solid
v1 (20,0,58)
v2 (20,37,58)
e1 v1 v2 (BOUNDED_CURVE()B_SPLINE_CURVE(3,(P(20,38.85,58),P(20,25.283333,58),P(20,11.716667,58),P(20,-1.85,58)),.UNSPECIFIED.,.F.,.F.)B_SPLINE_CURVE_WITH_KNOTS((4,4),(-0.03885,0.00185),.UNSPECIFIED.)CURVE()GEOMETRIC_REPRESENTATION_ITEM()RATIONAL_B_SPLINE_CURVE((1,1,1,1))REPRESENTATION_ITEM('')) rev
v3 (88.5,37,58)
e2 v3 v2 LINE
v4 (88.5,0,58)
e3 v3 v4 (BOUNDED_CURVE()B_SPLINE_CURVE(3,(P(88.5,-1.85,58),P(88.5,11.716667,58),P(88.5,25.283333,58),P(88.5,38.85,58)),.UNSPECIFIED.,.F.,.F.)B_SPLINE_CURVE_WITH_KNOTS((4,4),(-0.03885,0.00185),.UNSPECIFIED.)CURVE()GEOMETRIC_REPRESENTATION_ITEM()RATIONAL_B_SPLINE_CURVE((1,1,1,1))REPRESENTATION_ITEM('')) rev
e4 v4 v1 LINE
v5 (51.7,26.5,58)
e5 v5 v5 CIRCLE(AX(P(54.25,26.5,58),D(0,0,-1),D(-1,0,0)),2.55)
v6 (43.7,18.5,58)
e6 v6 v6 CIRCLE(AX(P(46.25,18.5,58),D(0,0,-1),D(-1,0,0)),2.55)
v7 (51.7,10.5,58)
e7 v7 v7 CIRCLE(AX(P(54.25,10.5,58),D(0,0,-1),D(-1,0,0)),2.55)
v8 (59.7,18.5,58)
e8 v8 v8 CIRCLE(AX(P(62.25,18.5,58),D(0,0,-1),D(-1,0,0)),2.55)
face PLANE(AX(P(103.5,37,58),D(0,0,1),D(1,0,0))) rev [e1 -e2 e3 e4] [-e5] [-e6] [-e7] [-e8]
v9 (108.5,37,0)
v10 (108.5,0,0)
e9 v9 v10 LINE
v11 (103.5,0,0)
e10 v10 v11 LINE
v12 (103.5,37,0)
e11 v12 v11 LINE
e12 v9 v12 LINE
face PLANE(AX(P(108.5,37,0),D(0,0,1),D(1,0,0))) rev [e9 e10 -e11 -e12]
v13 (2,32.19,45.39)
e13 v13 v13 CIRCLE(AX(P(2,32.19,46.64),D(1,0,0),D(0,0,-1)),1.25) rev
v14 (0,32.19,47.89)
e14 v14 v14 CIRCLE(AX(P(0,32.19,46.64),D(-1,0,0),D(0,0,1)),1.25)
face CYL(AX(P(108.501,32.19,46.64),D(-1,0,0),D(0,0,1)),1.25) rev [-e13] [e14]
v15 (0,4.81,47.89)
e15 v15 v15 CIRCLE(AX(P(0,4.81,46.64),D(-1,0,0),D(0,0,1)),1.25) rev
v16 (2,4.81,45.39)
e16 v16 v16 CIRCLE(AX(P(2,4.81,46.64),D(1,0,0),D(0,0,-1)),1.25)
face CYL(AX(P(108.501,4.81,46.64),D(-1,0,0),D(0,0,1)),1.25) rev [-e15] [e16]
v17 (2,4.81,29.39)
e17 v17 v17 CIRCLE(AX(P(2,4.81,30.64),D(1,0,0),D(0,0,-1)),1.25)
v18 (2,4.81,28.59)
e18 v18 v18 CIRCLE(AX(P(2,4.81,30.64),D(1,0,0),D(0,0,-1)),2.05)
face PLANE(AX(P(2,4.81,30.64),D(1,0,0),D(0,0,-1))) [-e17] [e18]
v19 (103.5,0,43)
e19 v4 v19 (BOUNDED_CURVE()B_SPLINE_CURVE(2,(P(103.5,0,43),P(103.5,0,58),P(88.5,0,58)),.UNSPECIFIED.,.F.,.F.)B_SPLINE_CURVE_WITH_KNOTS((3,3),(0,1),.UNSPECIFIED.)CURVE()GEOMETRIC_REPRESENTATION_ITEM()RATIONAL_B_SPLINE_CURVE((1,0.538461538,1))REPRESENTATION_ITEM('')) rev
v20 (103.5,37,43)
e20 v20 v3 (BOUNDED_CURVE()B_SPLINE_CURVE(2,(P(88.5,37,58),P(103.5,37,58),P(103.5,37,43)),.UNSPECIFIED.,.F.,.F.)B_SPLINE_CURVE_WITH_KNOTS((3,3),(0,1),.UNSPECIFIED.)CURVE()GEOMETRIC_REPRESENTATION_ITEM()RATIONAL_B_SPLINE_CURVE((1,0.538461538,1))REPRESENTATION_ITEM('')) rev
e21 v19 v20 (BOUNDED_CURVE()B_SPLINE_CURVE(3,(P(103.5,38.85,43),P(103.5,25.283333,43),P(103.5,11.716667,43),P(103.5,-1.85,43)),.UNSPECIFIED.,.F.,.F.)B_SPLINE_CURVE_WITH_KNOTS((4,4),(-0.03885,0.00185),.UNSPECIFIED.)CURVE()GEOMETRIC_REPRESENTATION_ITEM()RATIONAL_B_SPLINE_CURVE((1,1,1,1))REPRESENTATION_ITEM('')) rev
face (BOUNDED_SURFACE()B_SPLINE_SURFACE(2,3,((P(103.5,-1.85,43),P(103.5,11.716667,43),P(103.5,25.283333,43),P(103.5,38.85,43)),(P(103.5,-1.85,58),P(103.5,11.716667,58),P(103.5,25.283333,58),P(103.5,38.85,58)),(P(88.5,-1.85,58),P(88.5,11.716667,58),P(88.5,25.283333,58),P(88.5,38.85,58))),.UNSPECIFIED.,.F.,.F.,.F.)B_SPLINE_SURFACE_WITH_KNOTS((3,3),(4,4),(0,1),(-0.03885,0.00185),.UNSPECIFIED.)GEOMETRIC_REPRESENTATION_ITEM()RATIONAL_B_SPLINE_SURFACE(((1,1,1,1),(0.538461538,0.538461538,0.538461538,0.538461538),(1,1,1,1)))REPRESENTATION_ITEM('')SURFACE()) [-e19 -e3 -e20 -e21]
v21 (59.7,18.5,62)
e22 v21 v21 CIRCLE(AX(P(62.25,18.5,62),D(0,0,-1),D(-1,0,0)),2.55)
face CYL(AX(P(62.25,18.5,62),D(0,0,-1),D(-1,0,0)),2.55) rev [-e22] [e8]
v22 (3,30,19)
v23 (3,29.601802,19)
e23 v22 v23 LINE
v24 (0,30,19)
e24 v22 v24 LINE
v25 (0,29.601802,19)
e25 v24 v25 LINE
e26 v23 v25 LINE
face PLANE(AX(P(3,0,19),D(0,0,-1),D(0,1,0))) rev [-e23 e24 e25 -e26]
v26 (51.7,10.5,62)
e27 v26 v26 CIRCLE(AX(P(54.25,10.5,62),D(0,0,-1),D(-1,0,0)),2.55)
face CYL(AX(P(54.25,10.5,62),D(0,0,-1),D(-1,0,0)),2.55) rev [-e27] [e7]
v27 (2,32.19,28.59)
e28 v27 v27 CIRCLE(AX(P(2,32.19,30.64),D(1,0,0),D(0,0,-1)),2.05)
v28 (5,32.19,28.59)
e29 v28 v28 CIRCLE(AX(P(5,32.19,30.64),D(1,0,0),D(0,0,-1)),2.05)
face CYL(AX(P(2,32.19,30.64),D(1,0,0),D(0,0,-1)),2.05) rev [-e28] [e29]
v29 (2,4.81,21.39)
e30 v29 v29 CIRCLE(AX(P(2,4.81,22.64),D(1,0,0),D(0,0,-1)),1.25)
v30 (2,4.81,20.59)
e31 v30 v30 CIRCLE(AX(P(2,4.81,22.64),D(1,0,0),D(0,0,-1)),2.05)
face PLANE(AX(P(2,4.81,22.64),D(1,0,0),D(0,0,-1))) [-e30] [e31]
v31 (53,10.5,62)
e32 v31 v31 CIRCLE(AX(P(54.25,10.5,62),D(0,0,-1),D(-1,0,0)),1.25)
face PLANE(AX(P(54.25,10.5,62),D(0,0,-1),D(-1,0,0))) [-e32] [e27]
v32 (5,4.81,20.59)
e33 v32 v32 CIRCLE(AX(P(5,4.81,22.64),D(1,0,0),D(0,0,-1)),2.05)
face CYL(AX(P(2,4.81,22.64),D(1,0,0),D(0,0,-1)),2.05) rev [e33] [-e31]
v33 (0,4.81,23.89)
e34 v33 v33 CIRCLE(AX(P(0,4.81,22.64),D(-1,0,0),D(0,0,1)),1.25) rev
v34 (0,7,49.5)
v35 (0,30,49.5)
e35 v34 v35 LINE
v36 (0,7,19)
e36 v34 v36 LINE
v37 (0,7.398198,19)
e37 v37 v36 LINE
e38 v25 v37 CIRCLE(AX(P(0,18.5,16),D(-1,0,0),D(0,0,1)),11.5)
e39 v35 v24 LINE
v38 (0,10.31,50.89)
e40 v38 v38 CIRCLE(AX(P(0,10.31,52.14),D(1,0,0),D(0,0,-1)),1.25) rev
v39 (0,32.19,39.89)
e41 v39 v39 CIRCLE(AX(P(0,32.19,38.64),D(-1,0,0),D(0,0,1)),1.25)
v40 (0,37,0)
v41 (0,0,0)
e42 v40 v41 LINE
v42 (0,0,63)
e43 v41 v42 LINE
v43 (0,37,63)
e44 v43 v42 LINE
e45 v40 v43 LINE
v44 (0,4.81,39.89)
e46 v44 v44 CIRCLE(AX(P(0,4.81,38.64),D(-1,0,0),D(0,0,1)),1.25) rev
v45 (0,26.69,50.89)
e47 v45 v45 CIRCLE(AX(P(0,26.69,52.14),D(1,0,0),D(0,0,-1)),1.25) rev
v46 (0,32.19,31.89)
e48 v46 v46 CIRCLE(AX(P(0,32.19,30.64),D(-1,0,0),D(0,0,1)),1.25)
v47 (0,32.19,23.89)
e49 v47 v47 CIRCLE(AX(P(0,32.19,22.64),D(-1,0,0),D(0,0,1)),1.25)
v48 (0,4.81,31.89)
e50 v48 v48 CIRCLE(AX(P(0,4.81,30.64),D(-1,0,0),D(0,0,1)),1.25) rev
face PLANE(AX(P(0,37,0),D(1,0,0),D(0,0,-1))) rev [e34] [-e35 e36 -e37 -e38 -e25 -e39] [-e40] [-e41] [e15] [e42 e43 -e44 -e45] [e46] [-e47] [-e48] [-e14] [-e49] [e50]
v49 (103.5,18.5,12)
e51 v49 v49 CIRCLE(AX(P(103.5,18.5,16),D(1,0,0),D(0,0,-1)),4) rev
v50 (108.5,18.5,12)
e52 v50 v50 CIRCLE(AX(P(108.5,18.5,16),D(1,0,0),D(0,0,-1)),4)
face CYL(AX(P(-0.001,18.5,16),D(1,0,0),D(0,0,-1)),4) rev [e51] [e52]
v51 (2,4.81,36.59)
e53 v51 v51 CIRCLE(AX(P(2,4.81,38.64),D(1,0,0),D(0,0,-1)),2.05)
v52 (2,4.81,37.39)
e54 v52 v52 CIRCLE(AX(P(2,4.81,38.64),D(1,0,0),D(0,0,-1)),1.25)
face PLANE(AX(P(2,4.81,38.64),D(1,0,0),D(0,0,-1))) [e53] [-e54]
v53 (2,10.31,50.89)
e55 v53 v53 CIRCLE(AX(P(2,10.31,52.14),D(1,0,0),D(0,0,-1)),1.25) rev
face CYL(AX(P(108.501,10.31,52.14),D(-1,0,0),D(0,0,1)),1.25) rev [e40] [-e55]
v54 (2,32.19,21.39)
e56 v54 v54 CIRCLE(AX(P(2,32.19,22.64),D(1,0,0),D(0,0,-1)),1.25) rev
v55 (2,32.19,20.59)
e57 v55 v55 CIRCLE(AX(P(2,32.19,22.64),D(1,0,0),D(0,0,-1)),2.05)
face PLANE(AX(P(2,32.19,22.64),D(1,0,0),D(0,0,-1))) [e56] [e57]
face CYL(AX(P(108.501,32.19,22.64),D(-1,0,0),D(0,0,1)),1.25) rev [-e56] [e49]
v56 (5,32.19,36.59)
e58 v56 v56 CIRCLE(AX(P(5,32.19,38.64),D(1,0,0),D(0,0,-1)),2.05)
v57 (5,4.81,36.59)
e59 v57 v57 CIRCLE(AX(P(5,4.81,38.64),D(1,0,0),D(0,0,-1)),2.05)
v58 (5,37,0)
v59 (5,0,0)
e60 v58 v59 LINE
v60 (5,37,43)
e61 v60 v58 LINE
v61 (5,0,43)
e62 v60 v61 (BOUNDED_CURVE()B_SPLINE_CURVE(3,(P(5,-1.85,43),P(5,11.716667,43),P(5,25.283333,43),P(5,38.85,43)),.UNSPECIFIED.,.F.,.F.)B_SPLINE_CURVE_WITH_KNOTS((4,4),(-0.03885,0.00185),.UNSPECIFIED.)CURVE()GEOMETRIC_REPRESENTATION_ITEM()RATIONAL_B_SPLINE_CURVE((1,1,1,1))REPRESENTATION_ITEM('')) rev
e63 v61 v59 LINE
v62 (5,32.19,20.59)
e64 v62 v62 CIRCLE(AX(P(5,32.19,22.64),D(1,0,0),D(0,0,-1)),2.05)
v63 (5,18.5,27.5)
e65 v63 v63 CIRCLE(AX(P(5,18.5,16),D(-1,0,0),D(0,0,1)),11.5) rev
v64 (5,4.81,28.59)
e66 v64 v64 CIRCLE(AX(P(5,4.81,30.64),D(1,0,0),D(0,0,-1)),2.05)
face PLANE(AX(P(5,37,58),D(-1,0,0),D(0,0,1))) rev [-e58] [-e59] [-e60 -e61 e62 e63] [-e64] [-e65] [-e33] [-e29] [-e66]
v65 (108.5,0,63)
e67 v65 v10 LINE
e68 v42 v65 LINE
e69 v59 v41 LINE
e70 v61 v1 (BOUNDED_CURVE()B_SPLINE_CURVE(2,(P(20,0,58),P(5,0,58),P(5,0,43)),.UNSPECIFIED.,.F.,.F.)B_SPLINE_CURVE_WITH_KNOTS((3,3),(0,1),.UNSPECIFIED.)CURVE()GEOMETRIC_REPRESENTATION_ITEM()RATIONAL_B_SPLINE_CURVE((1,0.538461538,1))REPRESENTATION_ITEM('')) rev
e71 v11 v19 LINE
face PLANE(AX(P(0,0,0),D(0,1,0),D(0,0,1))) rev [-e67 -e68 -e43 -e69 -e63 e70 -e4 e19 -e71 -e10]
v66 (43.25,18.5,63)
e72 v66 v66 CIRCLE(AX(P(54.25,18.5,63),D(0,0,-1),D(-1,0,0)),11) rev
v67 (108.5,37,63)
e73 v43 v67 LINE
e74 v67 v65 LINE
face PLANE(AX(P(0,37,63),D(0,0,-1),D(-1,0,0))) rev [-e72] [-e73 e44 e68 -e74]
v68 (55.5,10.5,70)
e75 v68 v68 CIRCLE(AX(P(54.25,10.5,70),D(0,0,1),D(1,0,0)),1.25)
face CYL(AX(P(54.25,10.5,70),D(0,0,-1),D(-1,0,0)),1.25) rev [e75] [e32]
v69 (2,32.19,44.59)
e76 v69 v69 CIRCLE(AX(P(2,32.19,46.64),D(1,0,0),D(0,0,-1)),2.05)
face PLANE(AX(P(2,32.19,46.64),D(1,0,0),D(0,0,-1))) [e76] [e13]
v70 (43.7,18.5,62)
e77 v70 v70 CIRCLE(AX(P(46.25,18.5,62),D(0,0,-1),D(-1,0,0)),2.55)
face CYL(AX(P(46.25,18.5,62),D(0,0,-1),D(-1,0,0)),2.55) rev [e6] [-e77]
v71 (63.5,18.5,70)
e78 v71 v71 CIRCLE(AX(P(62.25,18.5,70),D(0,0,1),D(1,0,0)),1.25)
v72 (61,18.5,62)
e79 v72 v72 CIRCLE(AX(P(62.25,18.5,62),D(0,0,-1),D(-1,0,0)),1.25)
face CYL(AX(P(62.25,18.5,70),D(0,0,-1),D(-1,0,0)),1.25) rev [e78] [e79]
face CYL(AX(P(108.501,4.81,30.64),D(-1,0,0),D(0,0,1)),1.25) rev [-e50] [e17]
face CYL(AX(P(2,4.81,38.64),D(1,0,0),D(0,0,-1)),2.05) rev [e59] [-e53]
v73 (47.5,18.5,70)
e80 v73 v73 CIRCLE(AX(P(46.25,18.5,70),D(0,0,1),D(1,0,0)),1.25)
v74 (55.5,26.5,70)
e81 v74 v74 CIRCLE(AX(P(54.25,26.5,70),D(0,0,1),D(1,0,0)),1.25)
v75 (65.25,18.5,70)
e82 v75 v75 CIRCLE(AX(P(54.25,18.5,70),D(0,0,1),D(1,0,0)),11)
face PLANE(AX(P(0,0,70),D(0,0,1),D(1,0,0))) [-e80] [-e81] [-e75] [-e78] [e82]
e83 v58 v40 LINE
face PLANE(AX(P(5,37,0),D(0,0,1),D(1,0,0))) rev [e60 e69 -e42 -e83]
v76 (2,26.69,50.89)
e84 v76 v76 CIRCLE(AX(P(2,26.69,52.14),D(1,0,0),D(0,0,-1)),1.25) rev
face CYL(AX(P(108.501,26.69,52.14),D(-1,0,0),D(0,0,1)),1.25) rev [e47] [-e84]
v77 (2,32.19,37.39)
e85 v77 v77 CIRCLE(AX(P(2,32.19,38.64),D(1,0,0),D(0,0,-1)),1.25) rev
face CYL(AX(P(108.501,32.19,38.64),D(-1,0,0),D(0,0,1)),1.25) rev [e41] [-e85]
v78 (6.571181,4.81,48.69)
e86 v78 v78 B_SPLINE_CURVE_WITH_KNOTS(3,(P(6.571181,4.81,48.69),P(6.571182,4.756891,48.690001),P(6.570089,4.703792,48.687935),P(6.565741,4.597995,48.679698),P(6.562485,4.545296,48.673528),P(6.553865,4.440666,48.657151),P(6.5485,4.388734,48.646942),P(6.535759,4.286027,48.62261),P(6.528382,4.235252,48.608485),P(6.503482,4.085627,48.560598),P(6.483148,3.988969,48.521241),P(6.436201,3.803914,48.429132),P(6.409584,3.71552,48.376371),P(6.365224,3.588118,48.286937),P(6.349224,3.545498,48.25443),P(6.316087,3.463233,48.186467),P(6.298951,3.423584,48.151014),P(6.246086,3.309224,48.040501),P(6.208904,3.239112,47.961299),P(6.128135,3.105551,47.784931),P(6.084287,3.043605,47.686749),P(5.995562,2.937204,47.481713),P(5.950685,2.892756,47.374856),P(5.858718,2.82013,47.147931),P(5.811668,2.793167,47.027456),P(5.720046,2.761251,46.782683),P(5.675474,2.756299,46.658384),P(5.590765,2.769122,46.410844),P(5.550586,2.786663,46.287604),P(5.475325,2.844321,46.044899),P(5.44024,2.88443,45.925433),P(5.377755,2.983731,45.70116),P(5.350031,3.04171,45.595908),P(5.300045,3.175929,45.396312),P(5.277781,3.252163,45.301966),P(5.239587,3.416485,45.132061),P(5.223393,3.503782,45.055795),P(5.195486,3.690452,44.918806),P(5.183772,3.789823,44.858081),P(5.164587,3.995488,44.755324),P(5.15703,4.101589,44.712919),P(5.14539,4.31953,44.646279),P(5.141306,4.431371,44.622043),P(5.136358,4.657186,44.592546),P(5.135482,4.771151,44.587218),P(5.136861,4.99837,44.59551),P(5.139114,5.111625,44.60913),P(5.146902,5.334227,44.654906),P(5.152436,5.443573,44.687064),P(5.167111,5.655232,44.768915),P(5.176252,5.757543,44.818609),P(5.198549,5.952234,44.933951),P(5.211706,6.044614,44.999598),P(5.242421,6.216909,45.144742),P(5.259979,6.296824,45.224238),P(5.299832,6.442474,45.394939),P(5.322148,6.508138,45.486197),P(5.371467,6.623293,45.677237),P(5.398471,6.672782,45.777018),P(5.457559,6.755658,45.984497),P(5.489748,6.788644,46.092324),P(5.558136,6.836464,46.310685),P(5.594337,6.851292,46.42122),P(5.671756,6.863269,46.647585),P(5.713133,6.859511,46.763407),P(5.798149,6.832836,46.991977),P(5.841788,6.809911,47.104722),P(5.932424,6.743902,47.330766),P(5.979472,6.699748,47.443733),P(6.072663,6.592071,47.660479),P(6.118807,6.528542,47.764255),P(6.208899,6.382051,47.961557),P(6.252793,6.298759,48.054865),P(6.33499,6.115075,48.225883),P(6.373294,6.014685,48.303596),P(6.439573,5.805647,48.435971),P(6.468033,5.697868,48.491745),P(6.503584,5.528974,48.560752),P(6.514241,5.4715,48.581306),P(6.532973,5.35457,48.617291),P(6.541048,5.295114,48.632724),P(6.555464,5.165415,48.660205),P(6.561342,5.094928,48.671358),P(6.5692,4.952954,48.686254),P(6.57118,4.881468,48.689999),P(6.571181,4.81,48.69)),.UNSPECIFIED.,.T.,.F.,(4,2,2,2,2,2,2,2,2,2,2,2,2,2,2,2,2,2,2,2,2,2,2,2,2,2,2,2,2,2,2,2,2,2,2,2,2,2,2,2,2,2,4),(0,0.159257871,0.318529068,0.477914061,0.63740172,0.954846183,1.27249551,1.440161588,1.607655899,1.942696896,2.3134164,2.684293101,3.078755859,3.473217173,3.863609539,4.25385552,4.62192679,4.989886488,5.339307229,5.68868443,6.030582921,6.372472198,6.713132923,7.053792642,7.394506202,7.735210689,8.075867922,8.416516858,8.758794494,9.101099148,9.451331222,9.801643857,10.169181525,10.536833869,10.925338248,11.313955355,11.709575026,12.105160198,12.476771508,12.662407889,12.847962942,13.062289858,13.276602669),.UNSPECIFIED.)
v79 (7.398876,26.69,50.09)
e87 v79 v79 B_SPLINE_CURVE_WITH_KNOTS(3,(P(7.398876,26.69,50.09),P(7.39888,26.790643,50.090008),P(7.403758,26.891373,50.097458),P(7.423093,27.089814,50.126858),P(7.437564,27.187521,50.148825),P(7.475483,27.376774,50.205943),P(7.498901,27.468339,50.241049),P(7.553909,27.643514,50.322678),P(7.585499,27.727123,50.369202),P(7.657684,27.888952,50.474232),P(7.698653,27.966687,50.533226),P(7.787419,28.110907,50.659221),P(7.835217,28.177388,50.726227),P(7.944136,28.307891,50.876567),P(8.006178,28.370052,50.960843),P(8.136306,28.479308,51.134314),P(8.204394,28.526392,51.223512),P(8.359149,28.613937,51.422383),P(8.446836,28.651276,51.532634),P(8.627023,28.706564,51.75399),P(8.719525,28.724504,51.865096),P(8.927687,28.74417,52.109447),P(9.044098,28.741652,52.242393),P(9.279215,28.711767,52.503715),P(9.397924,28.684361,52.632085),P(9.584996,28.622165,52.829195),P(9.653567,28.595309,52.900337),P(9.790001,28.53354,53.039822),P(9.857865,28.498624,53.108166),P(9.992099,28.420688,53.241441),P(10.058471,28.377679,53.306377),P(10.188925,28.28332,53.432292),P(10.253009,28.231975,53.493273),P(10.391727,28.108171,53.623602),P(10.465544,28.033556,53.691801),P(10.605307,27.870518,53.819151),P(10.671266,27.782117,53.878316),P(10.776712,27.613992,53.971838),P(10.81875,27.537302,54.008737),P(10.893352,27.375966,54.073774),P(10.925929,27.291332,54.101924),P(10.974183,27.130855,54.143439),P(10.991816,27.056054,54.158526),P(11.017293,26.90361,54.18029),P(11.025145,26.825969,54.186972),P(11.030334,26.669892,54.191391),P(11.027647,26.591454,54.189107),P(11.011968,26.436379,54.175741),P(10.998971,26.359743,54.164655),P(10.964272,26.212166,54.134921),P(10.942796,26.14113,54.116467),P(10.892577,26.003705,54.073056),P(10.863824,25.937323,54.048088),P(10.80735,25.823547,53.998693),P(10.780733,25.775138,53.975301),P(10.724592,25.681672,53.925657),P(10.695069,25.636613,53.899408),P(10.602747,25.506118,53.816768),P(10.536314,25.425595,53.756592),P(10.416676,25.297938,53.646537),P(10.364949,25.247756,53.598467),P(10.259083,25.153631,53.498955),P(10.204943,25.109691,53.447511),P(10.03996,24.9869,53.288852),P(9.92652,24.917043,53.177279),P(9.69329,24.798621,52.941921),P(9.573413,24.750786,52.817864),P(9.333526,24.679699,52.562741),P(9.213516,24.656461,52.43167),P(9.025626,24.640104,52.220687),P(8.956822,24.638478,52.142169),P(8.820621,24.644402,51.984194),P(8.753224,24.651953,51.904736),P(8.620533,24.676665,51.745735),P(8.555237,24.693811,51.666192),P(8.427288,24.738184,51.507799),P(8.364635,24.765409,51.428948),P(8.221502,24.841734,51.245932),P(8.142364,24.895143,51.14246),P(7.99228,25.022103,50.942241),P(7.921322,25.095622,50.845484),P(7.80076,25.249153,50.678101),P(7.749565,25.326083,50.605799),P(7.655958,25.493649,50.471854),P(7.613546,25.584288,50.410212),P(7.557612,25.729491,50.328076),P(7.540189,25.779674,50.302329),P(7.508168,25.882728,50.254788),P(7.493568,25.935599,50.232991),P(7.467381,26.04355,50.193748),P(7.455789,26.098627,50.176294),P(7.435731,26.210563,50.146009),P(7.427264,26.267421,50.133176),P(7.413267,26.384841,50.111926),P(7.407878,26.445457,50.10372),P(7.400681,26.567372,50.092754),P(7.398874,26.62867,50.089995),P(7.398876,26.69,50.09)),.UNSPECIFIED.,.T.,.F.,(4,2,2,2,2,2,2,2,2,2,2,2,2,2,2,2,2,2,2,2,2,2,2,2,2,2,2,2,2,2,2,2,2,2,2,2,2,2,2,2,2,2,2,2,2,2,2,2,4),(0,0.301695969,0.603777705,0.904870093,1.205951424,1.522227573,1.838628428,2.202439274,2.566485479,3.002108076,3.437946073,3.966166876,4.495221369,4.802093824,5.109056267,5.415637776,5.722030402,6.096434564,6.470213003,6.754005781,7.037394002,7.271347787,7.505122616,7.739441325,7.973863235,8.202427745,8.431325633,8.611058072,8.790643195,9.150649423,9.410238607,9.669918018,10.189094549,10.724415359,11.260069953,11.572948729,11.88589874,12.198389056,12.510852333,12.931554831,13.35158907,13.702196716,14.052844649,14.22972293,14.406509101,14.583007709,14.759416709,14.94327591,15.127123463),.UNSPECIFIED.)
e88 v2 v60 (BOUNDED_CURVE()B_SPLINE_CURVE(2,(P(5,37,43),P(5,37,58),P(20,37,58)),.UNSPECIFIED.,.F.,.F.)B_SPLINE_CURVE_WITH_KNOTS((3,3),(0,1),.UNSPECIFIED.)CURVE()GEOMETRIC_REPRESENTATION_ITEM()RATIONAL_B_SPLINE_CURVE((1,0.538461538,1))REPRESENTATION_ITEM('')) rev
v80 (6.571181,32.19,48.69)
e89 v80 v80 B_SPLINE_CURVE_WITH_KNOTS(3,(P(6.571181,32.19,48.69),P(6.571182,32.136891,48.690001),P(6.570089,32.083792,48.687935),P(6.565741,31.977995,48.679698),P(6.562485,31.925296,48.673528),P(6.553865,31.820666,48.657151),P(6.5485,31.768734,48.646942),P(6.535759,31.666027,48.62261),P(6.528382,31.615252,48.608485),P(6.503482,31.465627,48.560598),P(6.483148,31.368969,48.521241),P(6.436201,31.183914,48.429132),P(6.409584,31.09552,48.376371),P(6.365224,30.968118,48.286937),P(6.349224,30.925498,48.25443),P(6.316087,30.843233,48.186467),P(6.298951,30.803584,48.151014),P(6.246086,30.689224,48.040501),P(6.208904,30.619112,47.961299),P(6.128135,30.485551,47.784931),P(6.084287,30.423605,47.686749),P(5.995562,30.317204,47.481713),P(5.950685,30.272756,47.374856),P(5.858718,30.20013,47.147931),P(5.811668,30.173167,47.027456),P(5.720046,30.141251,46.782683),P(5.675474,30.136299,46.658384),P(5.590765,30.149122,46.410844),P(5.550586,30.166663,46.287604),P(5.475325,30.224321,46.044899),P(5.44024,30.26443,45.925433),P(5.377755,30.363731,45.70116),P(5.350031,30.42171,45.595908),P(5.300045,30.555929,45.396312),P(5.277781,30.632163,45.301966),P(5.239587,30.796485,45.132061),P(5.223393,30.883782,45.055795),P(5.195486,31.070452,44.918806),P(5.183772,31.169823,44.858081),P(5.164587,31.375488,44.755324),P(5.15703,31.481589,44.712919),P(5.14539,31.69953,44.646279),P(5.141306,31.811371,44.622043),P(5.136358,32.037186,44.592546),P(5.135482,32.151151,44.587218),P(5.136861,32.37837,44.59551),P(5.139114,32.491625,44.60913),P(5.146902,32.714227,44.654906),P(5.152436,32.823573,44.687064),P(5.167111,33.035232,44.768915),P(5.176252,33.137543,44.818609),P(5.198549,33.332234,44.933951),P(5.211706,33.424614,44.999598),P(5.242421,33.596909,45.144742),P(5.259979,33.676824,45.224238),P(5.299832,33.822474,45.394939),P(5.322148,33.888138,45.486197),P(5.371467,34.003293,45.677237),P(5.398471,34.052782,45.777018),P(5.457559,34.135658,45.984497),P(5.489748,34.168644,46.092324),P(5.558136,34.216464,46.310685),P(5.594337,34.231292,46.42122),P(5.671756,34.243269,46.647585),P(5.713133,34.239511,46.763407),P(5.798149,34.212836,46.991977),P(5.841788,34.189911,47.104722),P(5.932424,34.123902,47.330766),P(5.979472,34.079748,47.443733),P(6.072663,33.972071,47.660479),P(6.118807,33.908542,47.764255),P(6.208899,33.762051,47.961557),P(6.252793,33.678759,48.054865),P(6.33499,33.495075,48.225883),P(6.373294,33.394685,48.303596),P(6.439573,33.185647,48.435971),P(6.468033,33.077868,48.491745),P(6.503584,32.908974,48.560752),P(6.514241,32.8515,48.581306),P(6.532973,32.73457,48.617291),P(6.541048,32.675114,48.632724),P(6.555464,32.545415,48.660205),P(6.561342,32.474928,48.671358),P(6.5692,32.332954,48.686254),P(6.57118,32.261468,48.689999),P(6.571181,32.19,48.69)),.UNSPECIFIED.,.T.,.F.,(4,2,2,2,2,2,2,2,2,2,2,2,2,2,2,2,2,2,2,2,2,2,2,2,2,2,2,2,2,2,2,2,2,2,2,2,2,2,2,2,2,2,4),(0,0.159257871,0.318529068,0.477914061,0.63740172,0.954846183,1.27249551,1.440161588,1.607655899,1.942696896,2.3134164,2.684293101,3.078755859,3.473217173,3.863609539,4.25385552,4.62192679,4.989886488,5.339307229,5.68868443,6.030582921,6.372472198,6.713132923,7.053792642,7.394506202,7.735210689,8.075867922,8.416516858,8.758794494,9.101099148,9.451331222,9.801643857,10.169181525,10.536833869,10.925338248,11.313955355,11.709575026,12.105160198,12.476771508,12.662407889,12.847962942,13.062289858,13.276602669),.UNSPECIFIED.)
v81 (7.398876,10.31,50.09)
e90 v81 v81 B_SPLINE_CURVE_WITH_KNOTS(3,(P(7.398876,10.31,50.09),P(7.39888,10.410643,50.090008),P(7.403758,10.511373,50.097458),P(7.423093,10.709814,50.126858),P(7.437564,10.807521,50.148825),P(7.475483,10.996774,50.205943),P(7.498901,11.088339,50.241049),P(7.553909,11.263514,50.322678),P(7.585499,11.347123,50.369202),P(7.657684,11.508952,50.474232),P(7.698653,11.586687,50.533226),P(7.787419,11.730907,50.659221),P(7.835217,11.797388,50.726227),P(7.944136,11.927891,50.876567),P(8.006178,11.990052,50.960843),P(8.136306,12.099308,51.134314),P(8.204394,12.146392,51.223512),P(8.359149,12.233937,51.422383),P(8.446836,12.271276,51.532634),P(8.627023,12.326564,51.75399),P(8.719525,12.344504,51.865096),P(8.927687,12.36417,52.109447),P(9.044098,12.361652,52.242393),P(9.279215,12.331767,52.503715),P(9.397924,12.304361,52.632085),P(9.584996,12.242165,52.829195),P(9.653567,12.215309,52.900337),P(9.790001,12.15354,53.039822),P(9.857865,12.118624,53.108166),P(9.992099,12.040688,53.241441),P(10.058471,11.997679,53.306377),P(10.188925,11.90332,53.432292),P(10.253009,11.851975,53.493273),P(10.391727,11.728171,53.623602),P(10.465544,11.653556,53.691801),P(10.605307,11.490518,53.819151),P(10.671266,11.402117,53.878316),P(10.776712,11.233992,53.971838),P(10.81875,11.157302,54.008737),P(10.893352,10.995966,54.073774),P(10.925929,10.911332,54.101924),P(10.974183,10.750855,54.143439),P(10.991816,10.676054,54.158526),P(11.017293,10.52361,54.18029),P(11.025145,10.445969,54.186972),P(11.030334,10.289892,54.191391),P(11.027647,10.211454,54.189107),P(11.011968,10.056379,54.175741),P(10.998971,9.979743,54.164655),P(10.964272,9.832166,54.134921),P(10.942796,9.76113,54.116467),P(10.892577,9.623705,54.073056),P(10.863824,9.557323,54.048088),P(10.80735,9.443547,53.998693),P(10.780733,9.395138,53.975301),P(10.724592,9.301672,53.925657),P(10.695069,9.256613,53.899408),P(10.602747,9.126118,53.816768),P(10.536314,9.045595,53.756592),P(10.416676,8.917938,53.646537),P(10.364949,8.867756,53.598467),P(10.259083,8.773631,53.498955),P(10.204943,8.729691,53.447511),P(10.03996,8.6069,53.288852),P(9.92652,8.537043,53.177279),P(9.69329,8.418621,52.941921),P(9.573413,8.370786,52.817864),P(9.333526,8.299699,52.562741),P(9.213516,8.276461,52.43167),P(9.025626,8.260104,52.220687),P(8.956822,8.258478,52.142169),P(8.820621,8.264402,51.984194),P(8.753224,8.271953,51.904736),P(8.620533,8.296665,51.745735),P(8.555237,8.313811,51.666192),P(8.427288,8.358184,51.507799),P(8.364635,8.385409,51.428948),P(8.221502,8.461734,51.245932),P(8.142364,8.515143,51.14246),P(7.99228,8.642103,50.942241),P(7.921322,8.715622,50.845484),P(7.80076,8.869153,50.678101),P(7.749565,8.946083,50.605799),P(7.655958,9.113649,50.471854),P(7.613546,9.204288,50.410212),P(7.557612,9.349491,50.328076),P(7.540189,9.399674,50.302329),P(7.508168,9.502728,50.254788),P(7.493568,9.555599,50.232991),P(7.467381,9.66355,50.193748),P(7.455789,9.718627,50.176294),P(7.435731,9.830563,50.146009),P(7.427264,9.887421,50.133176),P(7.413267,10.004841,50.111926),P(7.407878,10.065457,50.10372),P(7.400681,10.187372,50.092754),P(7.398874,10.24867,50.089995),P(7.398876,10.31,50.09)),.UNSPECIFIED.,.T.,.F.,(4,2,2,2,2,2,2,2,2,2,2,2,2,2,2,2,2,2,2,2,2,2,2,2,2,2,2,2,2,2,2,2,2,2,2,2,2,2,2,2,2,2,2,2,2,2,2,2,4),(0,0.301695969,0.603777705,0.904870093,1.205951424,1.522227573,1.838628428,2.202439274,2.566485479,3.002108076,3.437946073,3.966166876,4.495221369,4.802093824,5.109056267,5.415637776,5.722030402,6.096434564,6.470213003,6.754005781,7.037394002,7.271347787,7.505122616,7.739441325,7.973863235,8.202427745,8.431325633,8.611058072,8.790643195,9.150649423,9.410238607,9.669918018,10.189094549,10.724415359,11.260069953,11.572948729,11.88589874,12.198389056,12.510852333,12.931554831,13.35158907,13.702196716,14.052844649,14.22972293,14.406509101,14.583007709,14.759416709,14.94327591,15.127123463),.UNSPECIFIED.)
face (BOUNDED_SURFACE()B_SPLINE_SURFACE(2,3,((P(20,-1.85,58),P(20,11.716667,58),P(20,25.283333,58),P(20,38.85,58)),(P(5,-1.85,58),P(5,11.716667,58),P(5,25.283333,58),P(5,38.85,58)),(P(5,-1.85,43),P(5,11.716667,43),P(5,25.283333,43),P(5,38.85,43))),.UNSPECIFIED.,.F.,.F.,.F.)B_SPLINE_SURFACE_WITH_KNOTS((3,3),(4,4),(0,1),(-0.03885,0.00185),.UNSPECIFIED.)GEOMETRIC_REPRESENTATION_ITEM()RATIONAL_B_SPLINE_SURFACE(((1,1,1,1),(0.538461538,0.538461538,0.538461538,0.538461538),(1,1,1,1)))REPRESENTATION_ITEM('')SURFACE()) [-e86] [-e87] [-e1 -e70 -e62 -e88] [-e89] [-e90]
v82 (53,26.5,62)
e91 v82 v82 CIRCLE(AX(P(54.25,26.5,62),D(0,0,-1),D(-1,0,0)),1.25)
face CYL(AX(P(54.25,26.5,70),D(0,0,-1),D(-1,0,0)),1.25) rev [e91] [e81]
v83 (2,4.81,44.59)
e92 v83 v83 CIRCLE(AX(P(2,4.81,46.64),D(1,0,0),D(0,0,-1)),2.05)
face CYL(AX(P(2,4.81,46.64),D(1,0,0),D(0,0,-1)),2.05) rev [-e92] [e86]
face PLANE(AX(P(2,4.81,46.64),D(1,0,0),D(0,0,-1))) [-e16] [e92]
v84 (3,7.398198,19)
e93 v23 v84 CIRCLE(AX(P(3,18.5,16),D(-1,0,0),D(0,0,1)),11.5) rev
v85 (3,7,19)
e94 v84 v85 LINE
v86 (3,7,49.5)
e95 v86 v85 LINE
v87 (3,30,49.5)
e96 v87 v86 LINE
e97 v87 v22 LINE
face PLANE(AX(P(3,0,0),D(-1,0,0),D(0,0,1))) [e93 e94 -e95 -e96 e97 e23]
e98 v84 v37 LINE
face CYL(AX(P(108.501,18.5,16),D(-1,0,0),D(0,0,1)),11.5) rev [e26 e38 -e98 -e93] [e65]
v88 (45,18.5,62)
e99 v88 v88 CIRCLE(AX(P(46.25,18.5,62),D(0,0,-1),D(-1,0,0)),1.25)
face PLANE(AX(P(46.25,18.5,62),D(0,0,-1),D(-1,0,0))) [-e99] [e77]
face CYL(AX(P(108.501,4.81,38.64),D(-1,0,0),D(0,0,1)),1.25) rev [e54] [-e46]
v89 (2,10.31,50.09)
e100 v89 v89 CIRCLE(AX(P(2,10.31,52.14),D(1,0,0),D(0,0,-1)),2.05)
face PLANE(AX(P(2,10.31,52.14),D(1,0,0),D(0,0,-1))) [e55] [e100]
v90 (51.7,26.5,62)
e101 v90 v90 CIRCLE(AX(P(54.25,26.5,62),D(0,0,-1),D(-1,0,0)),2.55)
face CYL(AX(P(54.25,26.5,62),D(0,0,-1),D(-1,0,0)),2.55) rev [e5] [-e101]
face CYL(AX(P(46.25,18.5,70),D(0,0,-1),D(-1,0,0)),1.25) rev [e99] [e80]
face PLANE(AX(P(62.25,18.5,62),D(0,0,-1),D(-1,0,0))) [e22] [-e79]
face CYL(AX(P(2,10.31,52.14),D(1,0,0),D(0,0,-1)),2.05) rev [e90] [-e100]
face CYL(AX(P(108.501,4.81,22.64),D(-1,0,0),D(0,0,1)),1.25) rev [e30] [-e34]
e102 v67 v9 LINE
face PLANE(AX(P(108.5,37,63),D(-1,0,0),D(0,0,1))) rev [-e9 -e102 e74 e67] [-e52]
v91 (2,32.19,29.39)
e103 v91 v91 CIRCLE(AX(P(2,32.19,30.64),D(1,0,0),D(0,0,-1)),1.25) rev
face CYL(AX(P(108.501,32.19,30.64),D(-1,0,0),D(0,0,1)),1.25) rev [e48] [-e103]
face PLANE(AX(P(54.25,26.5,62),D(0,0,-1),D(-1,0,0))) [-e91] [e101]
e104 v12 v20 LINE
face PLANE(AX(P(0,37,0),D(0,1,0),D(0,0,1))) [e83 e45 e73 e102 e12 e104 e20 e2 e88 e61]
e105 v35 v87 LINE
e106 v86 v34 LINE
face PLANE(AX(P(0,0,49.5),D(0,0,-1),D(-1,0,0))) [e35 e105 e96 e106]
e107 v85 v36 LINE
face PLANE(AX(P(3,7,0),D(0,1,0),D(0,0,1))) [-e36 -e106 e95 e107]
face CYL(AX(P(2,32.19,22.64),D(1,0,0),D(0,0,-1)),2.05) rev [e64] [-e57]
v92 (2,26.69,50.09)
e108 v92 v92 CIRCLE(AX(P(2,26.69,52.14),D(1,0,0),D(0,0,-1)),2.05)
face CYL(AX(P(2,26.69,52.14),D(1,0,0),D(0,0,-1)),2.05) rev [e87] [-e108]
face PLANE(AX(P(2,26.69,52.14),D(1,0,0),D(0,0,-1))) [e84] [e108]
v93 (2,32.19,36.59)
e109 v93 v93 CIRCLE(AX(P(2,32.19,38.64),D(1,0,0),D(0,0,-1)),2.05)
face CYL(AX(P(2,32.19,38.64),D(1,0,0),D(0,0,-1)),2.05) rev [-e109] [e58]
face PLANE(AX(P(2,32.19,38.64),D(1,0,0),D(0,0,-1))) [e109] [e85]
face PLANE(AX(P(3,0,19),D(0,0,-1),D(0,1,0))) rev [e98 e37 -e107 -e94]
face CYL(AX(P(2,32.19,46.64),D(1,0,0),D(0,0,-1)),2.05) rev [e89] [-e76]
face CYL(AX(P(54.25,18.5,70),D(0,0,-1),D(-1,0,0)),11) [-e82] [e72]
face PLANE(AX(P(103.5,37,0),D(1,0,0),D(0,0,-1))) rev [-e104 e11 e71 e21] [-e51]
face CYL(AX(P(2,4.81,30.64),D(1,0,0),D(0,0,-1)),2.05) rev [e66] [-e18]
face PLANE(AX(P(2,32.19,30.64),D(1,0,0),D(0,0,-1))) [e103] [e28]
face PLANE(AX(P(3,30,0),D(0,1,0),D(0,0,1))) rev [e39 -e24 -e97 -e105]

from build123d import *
from build123d.topology import SkipClean

# Parameters (mm, degrees)
BOSS_EXTRUDE3_DEPTH = 37
CUT_EXTRUDE3_REACH  = 132.806
SKETCH3_R           = 11.5
CUT_EXTRUDE4_REACH  = 132.806
SKETCH4_R           = 1.25
SKETCH6_W           = 38
SKETCH6_H           = 23
CUT_EXTRUDE6_DEPTH  = 3
SKETCH10_W          = 3
SKETCH10_H          = 23
BOSS_EXTRUDE5_DEPTH = 7.5
CUT_EXTRUDE11_REACH = 130.329
SKETCH11_R          = 1.25
SKETCH12_R          = 2.05
CUT_EXTRUDE12_DEPTH = 3
CUT_EXTRUDE13_REACH = 132.806
SKETCH13_R          = 4
FILLET5_SIZE        = 15
SKETCH14_R          = 1.25
BOSS_EXTRUDE6_DEPTH = 7
CUT_EXTRUDE14_REACH = 136.318
SKETCH15_R          = 1.25
SKETCH16_R          = 2.55
CUT_EXTRUDE15_DEPTH = 4


with BuildPart() as part:
    # Sketch2 → Boss-Extrude3 (new body)
    with BuildSketch(Plane(origin=(0, 0, 0), x_dir=(1, 0, 0), z_dir=(0, 1, 0))):
        Polygon((0, 0), (0, -63), (108.5, -63), (108.5, 0), (103.5, 0), (103.5, -58), (5, -58), (5, 0), align=None)
    extrude(amount=BOSS_EXTRUDE3_DEPTH)

    # Sketch3 → Cut-Extrude3 (cut, up to next)
    with BuildSketch(Plane.ZY, mode=Mode.PRIVATE) as cut_extrude3_sk1:
        with Locations((16, 18.5)):
            Circle(SKETCH3_R)
    cut_extrude3_tool1 = extrude(cut_extrude3_sk1.sketch, amount=-CUT_EXTRUDE3_REACH, mode=Mode.PRIVATE) & part.part
    add(cut_extrude3_tool1.solids().sort_by_distance((0, 18.5, 16))[0], mode=Mode.SUBTRACT)

    # Sketch4 → Cut-Extrude4 (cut, up to next)
    with BuildSketch(Plane.ZY, mode=Mode.PRIVATE) as cut_extrude4_sk1:
        with Locations((22.64, 32.19)):
            Circle(SKETCH4_R)
    cut_extrude4_tool1 = extrude(cut_extrude4_sk1.sketch, amount=-CUT_EXTRUDE4_REACH, mode=Mode.PRIVATE) & part.part
    # Sketch4 → Cut-Extrude4 (cut, up to next)
    with BuildSketch(Plane.ZY, mode=Mode.PRIVATE) as cut_extrude4_sk2:
        with Locations((30.64, 32.19)):
            Circle(SKETCH4_R)
    cut_extrude4_tool2 = extrude(cut_extrude4_sk2.sketch, amount=-CUT_EXTRUDE4_REACH, mode=Mode.PRIVATE) & part.part
    # Sketch4 → Cut-Extrude4 (cut, up to next)
    with BuildSketch(Plane.ZY, mode=Mode.PRIVATE) as cut_extrude4_sk3:
        with Locations((38.64, 32.19)):
            Circle(SKETCH4_R)
    cut_extrude4_tool3 = extrude(cut_extrude4_sk3.sketch, amount=-CUT_EXTRUDE4_REACH, mode=Mode.PRIVATE) & part.part
    # Sketch4 → Cut-Extrude4 (cut, up to next)
    with BuildSketch(Plane.ZY, mode=Mode.PRIVATE) as cut_extrude4_sk4:
        with Locations((46.64, 32.19)):
            Circle(SKETCH4_R)
    cut_extrude4_tool4 = extrude(cut_extrude4_sk4.sketch, amount=-CUT_EXTRUDE4_REACH, mode=Mode.PRIVATE) & part.part
    # Sketch4 → Cut-Extrude4 (cut, up to next)
    with BuildSketch(Plane.ZY, mode=Mode.PRIVATE) as cut_extrude4_sk5:
        with Locations((46.64, 4.81)):
            Circle(SKETCH4_R)
    cut_extrude4_tool5 = extrude(cut_extrude4_sk5.sketch, amount=-CUT_EXTRUDE4_REACH, mode=Mode.PRIVATE) & part.part
    # Sketch4 → Cut-Extrude4 (cut, up to next)
    with BuildSketch(Plane.ZY, mode=Mode.PRIVATE) as cut_extrude4_sk6:
        with Locations((38.64, 4.81)):
            Circle(SKETCH4_R)
    cut_extrude4_tool6 = extrude(cut_extrude4_sk6.sketch, amount=-CUT_EXTRUDE4_REACH, mode=Mode.PRIVATE) & part.part
    # Sketch4 → Cut-Extrude4 (cut, up to next)
    with BuildSketch(Plane.ZY, mode=Mode.PRIVATE) as cut_extrude4_sk7:
        with Locations((30.64, 4.81)):
            Circle(SKETCH4_R)
    cut_extrude4_tool7 = extrude(cut_extrude4_sk7.sketch, amount=-CUT_EXTRUDE4_REACH, mode=Mode.PRIVATE) & part.part
    # Sketch4 → Cut-Extrude4 (cut, up to next)
    with BuildSketch(Plane.ZY, mode=Mode.PRIVATE) as cut_extrude4_sk8:
        with Locations((22.64, 4.81)):
            Circle(SKETCH4_R)
    cut_extrude4_tool8 = extrude(cut_extrude4_sk8.sketch, amount=-CUT_EXTRUDE4_REACH, mode=Mode.PRIVATE) & part.part
    # Sketch4 → Cut-Extrude4 (cut, up to next)
    with BuildSketch(Plane.ZY, mode=Mode.PRIVATE) as cut_extrude4_sk9:
        with Locations((52.14, 26.69)):
            Circle(SKETCH4_R)
    cut_extrude4_tool9 = extrude(cut_extrude4_sk9.sketch, amount=-CUT_EXTRUDE4_REACH, mode=Mode.PRIVATE) & part.part
    # Sketch4 → Cut-Extrude4 (cut, up to next)
    with BuildSketch(Plane.ZY, mode=Mode.PRIVATE) as cut_extrude4_sk10:
        with Locations((52.14, 10.31)):
            Circle(SKETCH4_R)
    cut_extrude4_tool10 = extrude(cut_extrude4_sk10.sketch, amount=-CUT_EXTRUDE4_REACH, mode=Mode.PRIVATE) & part.part
    add(cut_extrude4_tool1.solids().sort_by_distance((0, 32.19, 22.64))[0], mode=Mode.SUBTRACT)
    add(cut_extrude4_tool2.solids().sort_by_distance((0, 32.19, 30.64))[0], mode=Mode.SUBTRACT)
    add(cut_extrude4_tool3.solids().sort_by_distance((0, 32.19, 38.64))[0], mode=Mode.SUBTRACT)
    add(cut_extrude4_tool4.solids().sort_by_distance((0, 32.19, 46.64))[0], mode=Mode.SUBTRACT)
    add(cut_extrude4_tool5.solids().sort_by_distance((0, 4.81, 46.64))[0], mode=Mode.SUBTRACT)
    add(cut_extrude4_tool6.solids().sort_by_distance((0, 4.81, 38.64))[0], mode=Mode.SUBTRACT)
    add(cut_extrude4_tool7.solids().sort_by_distance((0, 4.81, 30.64))[0], mode=Mode.SUBTRACT)
    add(cut_extrude4_tool8.solids().sort_by_distance((0, 4.81, 22.64))[0], mode=Mode.SUBTRACT)
    add(cut_extrude4_tool9.solids().sort_by_distance((0, 26.69, 52.14))[0], mode=Mode.SUBTRACT)
    add(cut_extrude4_tool10.solids().sort_by_distance((0, 10.31, 52.14))[0], mode=Mode.SUBTRACT)

    # Sketch6 → Cut-Extrude6 (cut)
    with BuildSketch(Plane.ZY):
        with Locations((38, 18.5)):
            Rectangle(SKETCH6_W, SKETCH6_H)
    extrude(amount=-CUT_EXTRUDE6_DEPTH, mode=Mode.SUBTRACT)

    # Sketch10 → Boss-Extrude5 (add)
    with BuildSketch(Plane(origin=(0, 0, 57), x_dir=(-1, 0, 0), z_dir=(0, 0, -1))):
        with Locations((-1.5, 18.5)):
            Rectangle(SKETCH10_W, SKETCH10_H)
    extrude(amount=BOSS_EXTRUDE5_DEPTH)

    # Sketch11 → Cut-Extrude11 (cut, up to next)
    with BuildSketch(Plane(origin=(3, 0, 0), x_dir=(0, 0, -1), z_dir=(1, 0, 0)), mode=Mode.PRIVATE) as cut_extrude11_sk1:
        with Locations(Location((-52.14, 26.69, 0), (0, 0, 180))):
            Circle(SKETCH11_R)
    cut_extrude11_tool1 = extrude(cut_extrude11_sk1.sketch, amount=-CUT_EXTRUDE11_REACH, mode=Mode.PRIVATE) & part.part
    # Sketch11 → Cut-Extrude11 (cut, up to next)
    with BuildSketch(Plane(origin=(3, 0, 0), x_dir=(0, 0, -1), z_dir=(1, 0, 0)), mode=Mode.PRIVATE) as cut_extrude11_sk2:
        with Locations(Location((-52.14, 10.31, 0), (0, 0, 180))):
            Circle(SKETCH11_R)
    cut_extrude11_tool2 = extrude(cut_extrude11_sk2.sketch, amount=-CUT_EXTRUDE11_REACH, mode=Mode.PRIVATE) & part.part
    add(cut_extrude11_tool1.solids().sort_by_distance((3, 26.69, 52.14))[0], mode=Mode.SUBTRACT)
    add(cut_extrude11_tool2.solids().sort_by_distance((3, 10.31, 52.14))[0], mode=Mode.SUBTRACT)

    # Sketch12 → Cut-Extrude12 (cut)
    with BuildSketch(Plane(origin=(5, 0, 0), x_dir=(0, 0, -1), z_dir=(1, 0, 0))):
        with Locations((-52.14, 26.69)):
            Circle(SKETCH12_R)
        with Locations((-46.64, 32.19)):
            Circle(SKETCH12_R)
        with Locations((-38.64, 32.19)):
            Circle(SKETCH12_R)
        with Locations((-30.64, 32.19)):
            Circle(SKETCH12_R)
        with Locations((-22.64, 32.19)):
            Circle(SKETCH12_R)
        with Locations((-30.64, 4.81)):
            Circle(SKETCH12_R)
        with Locations((-22.64, 4.81)):
            Circle(SKETCH12_R)
        with Locations((-38.64, 4.81)):
            Circle(SKETCH12_R)
        with Locations((-46.64, 4.81)):
            Circle(SKETCH12_R)
        with Locations((-52.14, 10.31)):
            Circle(SKETCH12_R)
    extrude(amount=-CUT_EXTRUDE12_DEPTH, mode=Mode.SUBTRACT)

    # Sketch13 → Cut-Extrude13 (cut, up to next)
    with BuildSketch(Plane(origin=(108.5, 0, 0), x_dir=(0, 0, -1), z_dir=(1, 0, 0)), mode=Mode.PRIVATE) as cut_extrude13_sk1:
        with Locations((-16, 18.5)):
            Circle(SKETCH13_R)
    cut_extrude13_tool1 = extrude(cut_extrude13_sk1.sketch, amount=-CUT_EXTRUDE13_REACH, mode=Mode.PRIVATE) & part.part
    add(cut_extrude13_tool1.solids().sort_by_distance((108.5, 18.5, 16))[0], mode=Mode.SUBTRACT)

    # Fillet5
    # a fillet whose section is not a circle: 15 mm, written as the material it adds along each edge
    with BuildSketch(Plane(origin=(103.5, 0, 58), x_dir=(0, 0, -1), z_dir=(0, 1, 0))) as fillet5_piece_1:
        with BuildLine():
            Bezier((FILLET5_SIZE, 0), (0, 0), (0, FILLET5_SIZE), weights=[1, 0.538461538, 1])
            Line((0, FILLET5_SIZE), (0, 0))
            Line((0, 0), (FILLET5_SIZE, 0))
        make_face()
    extrude(amount=37)
    with BuildSketch(Plane(origin=(5, 0, 58), x_dir=(0, 0, -1), z_dir=(0, 1, 0))) as fillet5_piece_2_section:
        with BuildLine():
            Bezier((FILLET5_SIZE, 0), (0, 0), (0, -FILLET5_SIZE), weights=[1, 0.538461538, 1])
            Line((0, -FILLET5_SIZE), (0, 0))
            Line((0, 0), (FILLET5_SIZE, 0))
        make_face()
    fillet5_piece_2 = extrude(amount=37, mode=Mode.PRIVATE)
    fillet5_piece_2 = fillet5_piece_2 - Plane(origin=(5, 32.19, 46.64), x_dir=(0, 0, -1), z_dir=(1, 0, 0)) * Cylinder(2.05, 135, mode=Mode.PRIVATE)
    fillet5_piece_2 = fillet5_piece_2 - Plane(origin=(5, 26.69, 52.14), x_dir=(0, 0, -1), z_dir=(1, 0, 0)) * Cylinder(2.05, 135, mode=Mode.PRIVATE)
    fillet5_piece_2 = fillet5_piece_2 - Plane(origin=(5, 10.31, 52.14), x_dir=(0, 0, -1), z_dir=(1, 0, 0)) * Cylinder(2.05, 135, mode=Mode.PRIVATE)
    fillet5_piece_2 = fillet5_piece_2 - Plane(origin=(5, 4.81, 46.64), x_dir=(0, 0, -1), z_dir=(1, 0, 0)) * Cylinder(2.05, 135, mode=Mode.PRIVATE)
    add(fillet5_piece_2)

    # Sketch14 → Boss-Extrude6 (add)
    # profile 1 of 2: a face of its own
    with BuildSketch(Plane.XY.offset(63)):
        with BuildLine():
            Line((54.25, 27.75), (54.25, 29.5))
            ThreePointArc((54.25, 29.5), (43.25, 18.5), (54.25, 7.5))
            Line((54.25, 7.5), (54.25, 9.25))
            ThreePointArc((54.25, 9.25), (53, 10.5), (54.25, 11.75))
            Line((54.25, 11.75), (54.25, 25.25))
            ThreePointArc((54.25, 25.25), (53, 26.5), (54.25, 27.75))
        make_face()
        with Locations((46.25, 18.5)):
            Circle(SKETCH14_R, mode=Mode.SUBTRACT)
    # profile 2 of 2: a face of its own
    with BuildSketch(Plane.XY.offset(63)):
        with BuildLine():
            ThreePointArc((65.25, 18.5), (62.028174593, 26.278174593), (54.25, 29.5))
            Line((54.25, 29.5), (54.25, 27.75))
            ThreePointArc((54.25, 27.75), (55.133883476, 27.383883476), (55.5, 26.5))
            ThreePointArc((55.5, 26.5), (55.133883476, 25.616116524), (54.25, 25.25))
            Line((54.25, 25.25), (54.25, 11.75))
            ThreePointArc((54.25, 11.75), (55.133883476, 11.383883476), (55.5, 10.5))
            ThreePointArc((55.5, 10.5), (55.133883476, 9.616116524), (54.25, 9.25))
            Line((54.25, 9.25), (54.25, 7.5))
            ThreePointArc((54.25, 7.5), (62.028174593, 10.721825407), (65.25, 18.5))
        make_face()
        with Locations((62.25, 18.5)):
            Circle(SKETCH14_R, mode=Mode.SUBTRACT)
    extrude(amount=BOSS_EXTRUDE6_DEPTH)

    # Sketch15 → Cut-Extrude14 (cut, up to next)
    with BuildSketch(Plane.XY.offset(70), mode=Mode.PRIVATE) as cut_extrude14_sk1:
        with Locations((54.25, 10.5)):
            Circle(SKETCH15_R)
    cut_extrude14_tool1 = extrude(cut_extrude14_sk1.sketch, amount=-CUT_EXTRUDE14_REACH, mode=Mode.PRIVATE) & part.part
    # Sketch15 → Cut-Extrude14 (cut, up to next)
    with BuildSketch(Plane.XY.offset(70), mode=Mode.PRIVATE) as cut_extrude14_sk2:
        with Locations((46.25, 18.5)):
            Circle(SKETCH15_R)
    cut_extrude14_tool2 = extrude(cut_extrude14_sk2.sketch, amount=-CUT_EXTRUDE14_REACH, mode=Mode.PRIVATE) & part.part
    # Sketch15 → Cut-Extrude14 (cut, up to next)
    with BuildSketch(Plane.XY.offset(70), mode=Mode.PRIVATE) as cut_extrude14_sk3:
        with Locations((54.25, 26.5)):
            Circle(SKETCH15_R)
    cut_extrude14_tool3 = extrude(cut_extrude14_sk3.sketch, amount=-CUT_EXTRUDE14_REACH, mode=Mode.PRIVATE) & part.part
    # Sketch15 → Cut-Extrude14 (cut, up to next)
    with BuildSketch(Plane.XY.offset(70), mode=Mode.PRIVATE) as cut_extrude14_sk4:
        with Locations((62.25, 18.5)):
            Circle(SKETCH15_R)
    cut_extrude14_tool4 = extrude(cut_extrude14_sk4.sketch, amount=-CUT_EXTRUDE14_REACH, mode=Mode.PRIVATE) & part.part
    add(cut_extrude14_tool1.solids().sort_by_distance((54.25, 10.5, 70))[0], mode=Mode.SUBTRACT)
    add(cut_extrude14_tool2.solids().sort_by_distance((46.25, 18.5, 70))[0], mode=Mode.SUBTRACT)
    add(cut_extrude14_tool3.solids().sort_by_distance((54.25, 26.5, 70))[0], mode=Mode.SUBTRACT)
    add(cut_extrude14_tool4.solids().sort_by_distance((62.25, 18.5, 70))[0], mode=Mode.SUBTRACT)

    # Sketch16 → Cut-Extrude15 (cut)
    with SkipClean():  # the faces are left unmerged after this step: merging them gives an invalid solid
        with BuildSketch(Plane(origin=(0, 0, 58), x_dir=(-1, 0, 0), z_dir=(0, 0, -1))):
            with Locations((-46.25, 18.5)):
                Circle(SKETCH16_R)
            with Locations((-54.25, 10.5)):
                Circle(SKETCH16_R)
            with Locations((-62.25, 18.5)):
                Circle(SKETCH16_R)
            with Locations((-54.25, 26.5)):
                Circle(SKETCH16_R)
        extrude(amount=-CUT_EXTRUDE15_DEPTH, mode=Mode.SUBTRACT)


solid = part.part
